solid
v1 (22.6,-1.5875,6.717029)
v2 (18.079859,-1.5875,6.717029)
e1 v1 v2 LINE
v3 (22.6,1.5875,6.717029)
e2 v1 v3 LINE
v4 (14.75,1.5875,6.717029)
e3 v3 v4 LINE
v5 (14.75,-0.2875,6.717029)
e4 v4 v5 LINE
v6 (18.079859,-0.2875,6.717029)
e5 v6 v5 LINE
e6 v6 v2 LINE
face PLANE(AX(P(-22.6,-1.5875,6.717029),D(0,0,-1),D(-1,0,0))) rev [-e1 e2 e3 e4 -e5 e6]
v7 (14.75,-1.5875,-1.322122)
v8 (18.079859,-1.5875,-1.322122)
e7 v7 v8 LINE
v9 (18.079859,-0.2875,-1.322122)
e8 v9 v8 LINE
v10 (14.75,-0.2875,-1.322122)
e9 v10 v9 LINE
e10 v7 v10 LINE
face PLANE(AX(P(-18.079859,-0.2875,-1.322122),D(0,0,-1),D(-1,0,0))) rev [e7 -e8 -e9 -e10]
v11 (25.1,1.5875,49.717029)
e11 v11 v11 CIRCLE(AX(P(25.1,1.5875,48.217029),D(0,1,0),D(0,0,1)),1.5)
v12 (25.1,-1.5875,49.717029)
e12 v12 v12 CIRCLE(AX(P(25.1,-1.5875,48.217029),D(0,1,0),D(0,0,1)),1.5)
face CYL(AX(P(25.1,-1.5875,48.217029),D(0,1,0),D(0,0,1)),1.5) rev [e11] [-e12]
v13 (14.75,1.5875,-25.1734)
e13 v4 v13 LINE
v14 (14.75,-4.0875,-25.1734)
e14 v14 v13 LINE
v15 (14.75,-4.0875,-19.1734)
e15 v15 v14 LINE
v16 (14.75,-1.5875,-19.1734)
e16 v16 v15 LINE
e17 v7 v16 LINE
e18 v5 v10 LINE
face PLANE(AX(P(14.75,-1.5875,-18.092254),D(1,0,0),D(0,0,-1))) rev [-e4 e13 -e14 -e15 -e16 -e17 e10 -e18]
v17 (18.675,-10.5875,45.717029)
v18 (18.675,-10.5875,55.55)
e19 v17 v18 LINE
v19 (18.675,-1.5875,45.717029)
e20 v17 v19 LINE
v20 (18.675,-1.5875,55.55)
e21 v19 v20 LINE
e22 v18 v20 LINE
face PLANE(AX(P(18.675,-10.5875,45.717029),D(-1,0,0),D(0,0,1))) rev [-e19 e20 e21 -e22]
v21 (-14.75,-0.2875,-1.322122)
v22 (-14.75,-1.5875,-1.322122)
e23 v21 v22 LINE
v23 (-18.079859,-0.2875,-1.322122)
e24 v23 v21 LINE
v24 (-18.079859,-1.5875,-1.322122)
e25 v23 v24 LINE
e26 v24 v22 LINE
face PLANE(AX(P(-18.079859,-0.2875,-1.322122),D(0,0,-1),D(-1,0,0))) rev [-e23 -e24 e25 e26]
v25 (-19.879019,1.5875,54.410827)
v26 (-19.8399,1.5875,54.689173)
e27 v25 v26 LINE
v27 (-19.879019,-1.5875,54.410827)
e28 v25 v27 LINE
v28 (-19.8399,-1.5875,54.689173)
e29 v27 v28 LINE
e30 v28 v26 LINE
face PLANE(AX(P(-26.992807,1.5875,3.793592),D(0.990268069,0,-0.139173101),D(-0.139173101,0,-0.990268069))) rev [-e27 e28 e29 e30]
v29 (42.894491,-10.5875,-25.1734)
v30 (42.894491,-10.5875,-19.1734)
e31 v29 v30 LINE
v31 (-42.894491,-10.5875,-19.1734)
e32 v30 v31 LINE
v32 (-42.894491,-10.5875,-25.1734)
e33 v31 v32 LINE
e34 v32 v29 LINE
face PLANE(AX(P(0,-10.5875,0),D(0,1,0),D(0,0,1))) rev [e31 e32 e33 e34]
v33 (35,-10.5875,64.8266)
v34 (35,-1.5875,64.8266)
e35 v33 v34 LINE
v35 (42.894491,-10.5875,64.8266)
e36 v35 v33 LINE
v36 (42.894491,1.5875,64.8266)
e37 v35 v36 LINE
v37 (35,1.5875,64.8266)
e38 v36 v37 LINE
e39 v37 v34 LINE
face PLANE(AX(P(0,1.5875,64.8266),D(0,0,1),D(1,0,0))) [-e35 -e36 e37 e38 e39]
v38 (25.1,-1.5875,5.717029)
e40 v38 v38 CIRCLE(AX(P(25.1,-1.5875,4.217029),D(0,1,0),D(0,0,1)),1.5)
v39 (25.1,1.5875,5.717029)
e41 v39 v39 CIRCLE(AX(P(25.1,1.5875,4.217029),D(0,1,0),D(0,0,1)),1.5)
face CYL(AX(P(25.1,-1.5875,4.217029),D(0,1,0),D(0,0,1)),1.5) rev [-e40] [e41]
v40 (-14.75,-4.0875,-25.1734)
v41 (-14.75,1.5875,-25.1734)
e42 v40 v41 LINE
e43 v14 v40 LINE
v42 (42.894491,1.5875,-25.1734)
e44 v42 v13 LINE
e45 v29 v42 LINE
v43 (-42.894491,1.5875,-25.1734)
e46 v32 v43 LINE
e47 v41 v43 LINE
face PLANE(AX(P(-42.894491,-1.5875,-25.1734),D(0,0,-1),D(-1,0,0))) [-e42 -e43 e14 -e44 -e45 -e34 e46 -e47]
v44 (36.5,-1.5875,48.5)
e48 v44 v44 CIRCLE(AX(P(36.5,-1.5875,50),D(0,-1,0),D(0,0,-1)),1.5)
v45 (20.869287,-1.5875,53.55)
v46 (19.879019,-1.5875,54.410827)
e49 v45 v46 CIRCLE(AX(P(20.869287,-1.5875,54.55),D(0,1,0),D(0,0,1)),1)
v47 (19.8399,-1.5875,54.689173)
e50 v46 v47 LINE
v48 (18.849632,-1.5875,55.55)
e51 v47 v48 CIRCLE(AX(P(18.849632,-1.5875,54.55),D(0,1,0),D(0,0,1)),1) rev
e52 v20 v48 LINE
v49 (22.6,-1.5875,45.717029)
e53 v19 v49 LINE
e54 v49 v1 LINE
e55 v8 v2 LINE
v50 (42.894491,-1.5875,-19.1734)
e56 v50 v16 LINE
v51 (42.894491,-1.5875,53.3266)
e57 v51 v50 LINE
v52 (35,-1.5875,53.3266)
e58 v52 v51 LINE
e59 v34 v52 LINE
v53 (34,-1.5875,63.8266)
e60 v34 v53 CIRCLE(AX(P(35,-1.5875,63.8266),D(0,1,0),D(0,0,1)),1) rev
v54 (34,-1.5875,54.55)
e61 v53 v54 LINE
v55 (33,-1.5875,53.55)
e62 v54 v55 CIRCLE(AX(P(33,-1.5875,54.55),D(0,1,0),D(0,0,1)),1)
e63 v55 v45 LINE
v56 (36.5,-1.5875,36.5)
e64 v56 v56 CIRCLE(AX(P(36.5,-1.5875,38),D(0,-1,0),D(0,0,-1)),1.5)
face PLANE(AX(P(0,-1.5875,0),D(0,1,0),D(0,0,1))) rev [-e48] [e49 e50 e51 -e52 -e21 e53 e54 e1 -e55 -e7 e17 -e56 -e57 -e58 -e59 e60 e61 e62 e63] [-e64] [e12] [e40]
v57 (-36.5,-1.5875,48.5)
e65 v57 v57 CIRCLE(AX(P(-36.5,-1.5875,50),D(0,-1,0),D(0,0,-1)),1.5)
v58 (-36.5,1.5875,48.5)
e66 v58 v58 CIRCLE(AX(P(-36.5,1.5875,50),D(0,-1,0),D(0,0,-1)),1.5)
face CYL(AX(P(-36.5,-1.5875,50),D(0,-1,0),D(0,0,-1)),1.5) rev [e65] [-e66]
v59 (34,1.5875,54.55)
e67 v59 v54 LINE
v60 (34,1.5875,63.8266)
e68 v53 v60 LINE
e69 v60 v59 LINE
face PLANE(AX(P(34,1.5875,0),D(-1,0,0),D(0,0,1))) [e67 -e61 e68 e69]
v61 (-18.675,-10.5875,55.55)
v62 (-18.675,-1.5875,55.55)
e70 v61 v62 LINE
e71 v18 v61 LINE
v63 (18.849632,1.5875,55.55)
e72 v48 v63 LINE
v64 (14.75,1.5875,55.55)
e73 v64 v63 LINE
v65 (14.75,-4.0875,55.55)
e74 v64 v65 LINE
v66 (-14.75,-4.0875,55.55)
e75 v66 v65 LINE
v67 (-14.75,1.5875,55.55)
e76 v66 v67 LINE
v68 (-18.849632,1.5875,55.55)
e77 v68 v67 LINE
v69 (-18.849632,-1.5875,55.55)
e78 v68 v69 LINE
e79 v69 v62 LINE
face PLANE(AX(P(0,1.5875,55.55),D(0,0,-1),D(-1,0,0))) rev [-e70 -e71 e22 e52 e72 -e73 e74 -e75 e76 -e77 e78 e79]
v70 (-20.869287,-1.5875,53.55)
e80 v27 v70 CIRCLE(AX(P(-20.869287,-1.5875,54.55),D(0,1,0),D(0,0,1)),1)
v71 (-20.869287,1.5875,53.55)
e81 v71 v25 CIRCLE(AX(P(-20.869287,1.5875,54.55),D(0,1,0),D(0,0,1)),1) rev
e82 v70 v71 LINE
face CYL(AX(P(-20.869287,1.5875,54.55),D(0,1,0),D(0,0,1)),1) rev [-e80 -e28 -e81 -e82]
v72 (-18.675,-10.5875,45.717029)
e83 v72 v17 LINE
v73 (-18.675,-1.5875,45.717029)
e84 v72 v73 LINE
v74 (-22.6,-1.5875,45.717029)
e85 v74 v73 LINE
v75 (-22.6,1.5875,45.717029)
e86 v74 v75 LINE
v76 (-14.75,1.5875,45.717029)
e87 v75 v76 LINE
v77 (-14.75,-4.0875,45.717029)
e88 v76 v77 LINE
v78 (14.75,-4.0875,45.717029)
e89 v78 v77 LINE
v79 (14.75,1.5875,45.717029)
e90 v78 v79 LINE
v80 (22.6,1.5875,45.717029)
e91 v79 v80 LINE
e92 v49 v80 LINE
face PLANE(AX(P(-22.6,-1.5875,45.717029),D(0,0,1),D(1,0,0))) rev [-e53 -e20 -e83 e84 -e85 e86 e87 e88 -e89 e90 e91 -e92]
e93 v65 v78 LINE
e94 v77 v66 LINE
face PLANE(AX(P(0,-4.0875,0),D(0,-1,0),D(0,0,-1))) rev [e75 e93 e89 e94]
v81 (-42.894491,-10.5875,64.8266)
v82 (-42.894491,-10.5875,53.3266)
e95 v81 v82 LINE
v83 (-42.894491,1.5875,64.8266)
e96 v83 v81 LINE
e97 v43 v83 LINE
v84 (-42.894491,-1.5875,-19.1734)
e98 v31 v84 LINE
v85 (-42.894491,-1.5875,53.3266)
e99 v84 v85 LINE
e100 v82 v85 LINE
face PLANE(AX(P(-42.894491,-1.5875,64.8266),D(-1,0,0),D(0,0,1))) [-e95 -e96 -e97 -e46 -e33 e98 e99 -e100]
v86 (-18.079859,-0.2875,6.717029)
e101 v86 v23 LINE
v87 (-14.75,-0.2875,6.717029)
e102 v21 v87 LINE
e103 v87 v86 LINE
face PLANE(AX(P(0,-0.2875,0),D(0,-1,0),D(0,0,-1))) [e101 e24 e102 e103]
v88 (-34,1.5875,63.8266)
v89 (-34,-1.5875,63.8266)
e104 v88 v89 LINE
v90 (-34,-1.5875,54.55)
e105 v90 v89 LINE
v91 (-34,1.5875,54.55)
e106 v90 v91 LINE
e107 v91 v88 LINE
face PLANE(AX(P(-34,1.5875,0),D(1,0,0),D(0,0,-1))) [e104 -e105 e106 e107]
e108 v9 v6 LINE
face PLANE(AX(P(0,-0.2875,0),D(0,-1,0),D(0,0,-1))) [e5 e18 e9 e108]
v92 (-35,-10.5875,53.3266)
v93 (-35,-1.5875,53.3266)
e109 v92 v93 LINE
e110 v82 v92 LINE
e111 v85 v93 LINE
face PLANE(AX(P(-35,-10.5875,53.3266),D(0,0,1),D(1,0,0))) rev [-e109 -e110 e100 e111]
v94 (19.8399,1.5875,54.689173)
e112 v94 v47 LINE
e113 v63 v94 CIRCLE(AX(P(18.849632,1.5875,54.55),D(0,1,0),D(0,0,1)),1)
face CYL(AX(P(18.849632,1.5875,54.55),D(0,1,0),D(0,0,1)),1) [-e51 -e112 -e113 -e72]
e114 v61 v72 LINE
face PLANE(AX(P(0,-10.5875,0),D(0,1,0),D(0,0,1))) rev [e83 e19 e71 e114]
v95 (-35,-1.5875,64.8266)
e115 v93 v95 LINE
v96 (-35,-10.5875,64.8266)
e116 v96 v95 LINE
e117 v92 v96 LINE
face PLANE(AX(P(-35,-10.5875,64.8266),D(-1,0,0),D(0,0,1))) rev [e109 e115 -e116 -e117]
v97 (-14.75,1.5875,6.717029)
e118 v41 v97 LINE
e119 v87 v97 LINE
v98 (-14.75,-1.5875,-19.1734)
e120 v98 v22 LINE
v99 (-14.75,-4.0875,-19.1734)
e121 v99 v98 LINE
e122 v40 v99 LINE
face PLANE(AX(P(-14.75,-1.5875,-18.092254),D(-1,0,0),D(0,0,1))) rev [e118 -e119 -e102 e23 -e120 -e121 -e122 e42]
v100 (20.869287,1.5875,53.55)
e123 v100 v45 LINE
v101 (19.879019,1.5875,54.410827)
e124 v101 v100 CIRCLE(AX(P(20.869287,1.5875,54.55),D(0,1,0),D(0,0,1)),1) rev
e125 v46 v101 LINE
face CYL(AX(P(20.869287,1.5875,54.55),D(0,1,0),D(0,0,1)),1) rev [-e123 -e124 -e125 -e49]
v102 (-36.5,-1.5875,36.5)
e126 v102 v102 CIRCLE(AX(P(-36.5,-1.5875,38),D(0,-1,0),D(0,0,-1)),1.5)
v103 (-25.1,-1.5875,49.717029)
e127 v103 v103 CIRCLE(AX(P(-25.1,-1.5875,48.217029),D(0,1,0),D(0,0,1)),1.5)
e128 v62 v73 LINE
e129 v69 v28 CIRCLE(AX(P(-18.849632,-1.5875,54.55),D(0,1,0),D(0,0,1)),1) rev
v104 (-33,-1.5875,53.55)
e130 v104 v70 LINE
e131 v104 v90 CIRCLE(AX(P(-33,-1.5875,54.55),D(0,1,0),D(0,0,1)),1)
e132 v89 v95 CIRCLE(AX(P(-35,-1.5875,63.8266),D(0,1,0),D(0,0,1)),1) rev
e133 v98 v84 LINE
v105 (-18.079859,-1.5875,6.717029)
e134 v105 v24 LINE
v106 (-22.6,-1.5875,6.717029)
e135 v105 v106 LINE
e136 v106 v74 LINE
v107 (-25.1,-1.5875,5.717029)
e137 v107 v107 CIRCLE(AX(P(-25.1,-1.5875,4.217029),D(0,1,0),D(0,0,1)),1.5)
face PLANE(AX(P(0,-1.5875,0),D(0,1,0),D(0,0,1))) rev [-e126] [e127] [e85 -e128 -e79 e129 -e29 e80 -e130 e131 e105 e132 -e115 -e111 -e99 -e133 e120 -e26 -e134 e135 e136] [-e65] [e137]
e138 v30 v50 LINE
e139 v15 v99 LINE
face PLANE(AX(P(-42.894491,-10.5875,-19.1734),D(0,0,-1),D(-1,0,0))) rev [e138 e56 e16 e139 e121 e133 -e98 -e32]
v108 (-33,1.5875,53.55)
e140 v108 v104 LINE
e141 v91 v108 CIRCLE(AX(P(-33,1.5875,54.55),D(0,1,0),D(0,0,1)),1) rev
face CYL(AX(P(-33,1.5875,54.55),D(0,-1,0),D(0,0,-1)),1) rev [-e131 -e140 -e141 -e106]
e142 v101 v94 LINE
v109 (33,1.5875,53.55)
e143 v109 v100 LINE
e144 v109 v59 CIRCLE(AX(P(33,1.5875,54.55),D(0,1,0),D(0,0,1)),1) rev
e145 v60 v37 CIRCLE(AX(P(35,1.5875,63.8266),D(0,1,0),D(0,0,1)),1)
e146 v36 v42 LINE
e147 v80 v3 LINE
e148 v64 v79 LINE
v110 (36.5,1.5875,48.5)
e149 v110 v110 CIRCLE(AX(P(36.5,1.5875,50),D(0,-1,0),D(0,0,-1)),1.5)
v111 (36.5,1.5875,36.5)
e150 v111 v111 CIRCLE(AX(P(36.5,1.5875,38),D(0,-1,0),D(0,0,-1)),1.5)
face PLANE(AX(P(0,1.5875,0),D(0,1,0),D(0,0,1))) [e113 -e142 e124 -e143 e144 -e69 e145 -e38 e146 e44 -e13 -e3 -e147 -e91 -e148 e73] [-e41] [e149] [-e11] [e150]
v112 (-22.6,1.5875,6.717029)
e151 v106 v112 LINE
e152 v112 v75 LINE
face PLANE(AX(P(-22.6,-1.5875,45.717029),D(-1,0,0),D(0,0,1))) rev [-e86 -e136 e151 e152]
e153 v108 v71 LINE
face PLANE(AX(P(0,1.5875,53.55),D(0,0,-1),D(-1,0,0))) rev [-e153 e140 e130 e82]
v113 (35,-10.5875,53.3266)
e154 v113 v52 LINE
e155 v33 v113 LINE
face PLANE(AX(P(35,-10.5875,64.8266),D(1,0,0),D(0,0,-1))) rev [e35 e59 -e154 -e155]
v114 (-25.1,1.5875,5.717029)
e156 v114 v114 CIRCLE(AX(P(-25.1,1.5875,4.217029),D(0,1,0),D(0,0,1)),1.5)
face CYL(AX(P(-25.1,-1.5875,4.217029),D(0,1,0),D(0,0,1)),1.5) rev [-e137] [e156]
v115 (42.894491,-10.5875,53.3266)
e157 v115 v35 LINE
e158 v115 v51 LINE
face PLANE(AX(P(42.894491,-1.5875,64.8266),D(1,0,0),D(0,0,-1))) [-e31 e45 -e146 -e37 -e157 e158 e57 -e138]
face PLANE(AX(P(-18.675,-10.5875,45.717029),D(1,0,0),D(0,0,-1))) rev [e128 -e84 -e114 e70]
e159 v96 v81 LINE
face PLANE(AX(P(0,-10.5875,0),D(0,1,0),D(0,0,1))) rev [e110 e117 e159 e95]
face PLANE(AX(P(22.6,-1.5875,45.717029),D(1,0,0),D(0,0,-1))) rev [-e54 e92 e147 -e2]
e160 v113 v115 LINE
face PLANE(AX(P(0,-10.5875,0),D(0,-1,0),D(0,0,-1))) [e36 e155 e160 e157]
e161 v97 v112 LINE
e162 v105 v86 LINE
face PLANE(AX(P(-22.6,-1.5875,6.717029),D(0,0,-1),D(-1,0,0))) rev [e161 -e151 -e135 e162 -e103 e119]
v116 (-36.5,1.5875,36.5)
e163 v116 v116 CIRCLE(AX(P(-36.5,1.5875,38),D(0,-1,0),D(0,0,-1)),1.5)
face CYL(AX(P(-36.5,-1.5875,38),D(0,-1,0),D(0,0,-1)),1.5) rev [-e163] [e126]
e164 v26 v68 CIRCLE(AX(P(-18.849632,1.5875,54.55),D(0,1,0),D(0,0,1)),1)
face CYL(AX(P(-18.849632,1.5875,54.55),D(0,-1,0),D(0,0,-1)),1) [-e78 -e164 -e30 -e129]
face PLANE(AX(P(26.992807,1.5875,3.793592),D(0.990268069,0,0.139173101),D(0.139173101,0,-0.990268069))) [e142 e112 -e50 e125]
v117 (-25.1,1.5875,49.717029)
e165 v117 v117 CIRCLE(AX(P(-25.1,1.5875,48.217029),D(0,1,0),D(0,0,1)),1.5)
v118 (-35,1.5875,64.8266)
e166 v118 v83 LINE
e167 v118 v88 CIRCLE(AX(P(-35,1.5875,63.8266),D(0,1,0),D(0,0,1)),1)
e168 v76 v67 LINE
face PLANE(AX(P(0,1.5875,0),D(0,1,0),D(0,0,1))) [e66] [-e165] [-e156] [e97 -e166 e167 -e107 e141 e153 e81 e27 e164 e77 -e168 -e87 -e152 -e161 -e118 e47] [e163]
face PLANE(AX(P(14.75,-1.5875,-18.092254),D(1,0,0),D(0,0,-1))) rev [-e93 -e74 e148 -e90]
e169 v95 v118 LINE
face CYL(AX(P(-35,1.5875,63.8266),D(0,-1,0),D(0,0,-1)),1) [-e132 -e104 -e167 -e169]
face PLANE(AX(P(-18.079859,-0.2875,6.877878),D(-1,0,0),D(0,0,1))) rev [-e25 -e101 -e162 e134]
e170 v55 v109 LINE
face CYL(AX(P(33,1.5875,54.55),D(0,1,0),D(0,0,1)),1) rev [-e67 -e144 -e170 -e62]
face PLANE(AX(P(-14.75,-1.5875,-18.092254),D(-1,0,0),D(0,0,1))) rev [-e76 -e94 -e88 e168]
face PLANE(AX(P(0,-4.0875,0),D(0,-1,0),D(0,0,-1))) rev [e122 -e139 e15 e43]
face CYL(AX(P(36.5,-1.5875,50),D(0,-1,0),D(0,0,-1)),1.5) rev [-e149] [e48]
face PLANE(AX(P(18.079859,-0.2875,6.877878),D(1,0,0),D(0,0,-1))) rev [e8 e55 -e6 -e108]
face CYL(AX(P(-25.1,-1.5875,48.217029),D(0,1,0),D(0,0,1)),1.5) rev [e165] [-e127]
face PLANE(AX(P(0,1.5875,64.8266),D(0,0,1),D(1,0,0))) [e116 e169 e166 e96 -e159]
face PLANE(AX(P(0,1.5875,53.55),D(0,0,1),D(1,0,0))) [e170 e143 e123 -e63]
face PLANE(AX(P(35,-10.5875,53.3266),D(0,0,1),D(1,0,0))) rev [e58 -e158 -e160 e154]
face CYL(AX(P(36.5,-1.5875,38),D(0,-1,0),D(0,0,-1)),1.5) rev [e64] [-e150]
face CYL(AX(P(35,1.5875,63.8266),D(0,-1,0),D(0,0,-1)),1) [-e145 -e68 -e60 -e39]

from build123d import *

# Parameters (mm, degrees)
BOSS_EXTRUDE4_DEPTH    = 1.5875
M3_CLEARANCE_HOLE3_D   = 3
M3_CLEARANCE_HOLE1_D   = 3.1
M3_CLEARANCE_HOLE4_D   = 2.95
M3_CLEARANCE_HOLE2_D   = 3.1
M3_CLEARANCE_HOLE5_D   = 3
BOSS_EXTRUDE6_START    = -3.175
BOSS_EXTRUDE6_DEPTH    = 3.175
FILLET1_R              = 2
CUT_EXTRUDE4_START     = -1.5875
CUT_EXTRUDE4_OUTLINE_W = 45.2
CUT_EXTRUDE4_OUTLINE_H = 39
CUT_EXTRUDE4_OUTLINE_R = 1.5
CUT_EXTRUDE4_DEPTH     = 3.175
CUT_EXTRUDE4_2_DEPTH   = 3.175
SKETCH29_W             = 29.5
SKETCH29_H             = 74
CUT_EXTRUDE5_DEPTH     = 121.250075364
SKETCH30_R             = 1.5
CUT_EXTRUDE6_DEPTH     = 121.250075364
SKETCH31_W             = 36.15971715
SKETCH31_H             = 8.2
CUT_EXTRUDE7_DEPTH     = 1.3
SKETCH32_OUTSIDE_W     = 217.324
SKETCH32_OUTSIDE_H     = 197.151
SKETCH32_OUTSIDE_W_2   = 85.788981544
SKETCH32_OUTSIDE_H_2   = 90
CUT_EXTRUDE8_DEPTH     = 121.250075364
SKETCH33_W             = 7.894490772
SKETCH33_H             = 11.5
SKETCH33_W_2           = 37.35
SKETCH33_H_2           = 9.832970801
SKETCH33_W_3           = 85.788981544
SKETCH33_H_3           = 6
BOSS_EXTRUDE9_DEPTH    = 9
SKETCH34_W             = 29.5
SKETCH34_H             = 9.832970801
CUT_EXTRUDE9_DEPTH     = 2.5
SKETCH35_W             = 29.5
SKETCH35_H             = 7.081145589
CUT_EXTRUDE10_DEPTH    = 5.675


# Read off the part's stored shape, not the designer's step: Cut-Extrude4
with BuildPart() as part:
    # Sketch1 → Boss-Extrude4 (new, symmetric)
    with BuildSketch(Plane(origin=(0, 0, 0), x_dir=(1, 0, 0), z_dir=(0, 1, 0))):
        with BuildLine():
            Line((-62.799553621, 32.496136604), (-73.969425011, 32.691107434))
            Line((-73.969425011, 32.691107434), (-77.053684287, 35.88495141))
            ThreePointArc((-77.053684287, 35.88495141), (-84.36642289, 10.358894189), (-83.446216027, -16.178041625))
            Line((-83.446216027, -16.178041625), (-79.680911643, -13.825218315))
            Line((-79.680911643, -13.825218315), (-69.484649137, -16.179210996))
            Line((-69.484649137, -16.179210996), (-43.894490772, -57.132025032))
            Line((-43.894490772, -57.132025032), (-43.894490772, -64.826600275))
            Line((-43.894490772, -64.826600275), (-43.094490772, -64.826600275))
            Line((-43.094490772, -64.826600275), (-34, -64.826600275))
            Line((-34, -64.826600275), (-34, -55.55))
            Line((-34, -55.55), (-34, -53.55))
            Line((-34, -53.55), (-20, -53.55))
            Line((-20, -53.55), (-19.718918331, -55.55))
            Line((-19.718918331, -55.55), (19.718918331, -55.55))
            Line((19.718918331, -55.55), (20, -53.55))
            Line((20, -53.55), (34, -53.55))
            Line((34, -53.55), (34, -55.55))
            Line((34, -55.55), (34, -64.826600275))
            Line((34, -64.826600275), (43.094490772, -64.826600275))
            Line((43.094490772, -64.826600275), (43.894490772, -64.826600275))
            Line((43.894490772, -64.826600275), (43.894490772, -57.132025032))
            Line((43.894490772, -57.132025032), (69.484649137, -16.179210996))
            Line((69.484649137, -16.179210996), (79.680911643, -13.825218315))
            Line((79.680911643, -13.825218315), (83.446216027, -16.178041625))
            ThreePointArc((83.446216027, -16.178041625), (84.610662337, -8.126242604), (85, 0))
            ThreePointArc((85, 0), (82.98964744, 18.377116688), (77.053684287, 35.88495141))
            Line((77.053684287, 35.88495141), (73.969425011, 32.691107434))
            Line((73.969425011, 32.691107434), (62.799553621, 32.496136604))
            Line((62.799553621, 32.496136604), (30.284668021, 63.895396642))
            Line((30.284668021, 63.895396642), (30.089697191, 75.065268032))
            Line((30.089697191, 75.065268032), (33.173956467, 78.259112008))
            ThreePointArc((33.173956467, 78.259112008), (0, 85), (-33.173956467, 78.259112008))
            Line((-33.173956467, 78.259112008), (-30.089697191, 75.065268032))
            Line((-30.089697191, 75.065268032), (-30.284668021, 63.895396642))
            Line((-30.284668021, 63.895396642), (-62.799553621, 32.496136604))
        make_face()
    extrude(amount=BOSS_EXTRUDE4_DEPTH, both=True)

    # M3 Clearance Hole3 (through all)
    with Locations(Plane(origin=(0, -1.5875, 0), x_dir=(-1, 0, 0), z_dir=(0, -1, 0))):
        with Locations((36.5, -50), (36.5, -38), (-36.5, -50), (-36.5, -38)):
            Hole(M3_CLEARANCE_HOLE3_D / 2)

    # M3 Clearance Hole1 (through all)
    with Locations(Plane(origin=(0, 1.5875, 0), x_dir=(1, 0, 0), z_dir=(0, 1, 0))):
        with Locations((-78.542321426, -8.49139241), (78.542321426, -8.49139241), (74.155025063, 27.240269049), (-74.155025063, 27.240269049)):
            Hole(M3_CLEARANCE_HOLE1_D / 2)

    # M3 Clearance Hole4 (through all)
    with Locations(Plane(origin=(0, -1.5875, 0), x_dir=(-1, 0, 0), z_dir=(0, -1, 0))):
        with Locations((-67.099301622, -15.278865202), (-50.141885166, -42.416404279), (-61.062544382, 30.698137949), (-38.043670771, 52.927205804), (50.141885166, -42.416404279), (67.099301622, -15.278865202), (38.043670771, 52.927205804), (61.062544382, 30.698137949)):
            Hole(M3_CLEARANCE_HOLE4_D / 2)

    # M3 Clearance Hole2 (through all)
    with Locations(Plane(origin=(0, 1.5875, 0), x_dir=(1, 0, 0), z_dir=(0, 1, 0))):
        with Locations((27, 76.497766718), (-27, 76.497766718)):
            Hole(M3_CLEARANCE_HOLE2_D / 2)

    # M3 Clearance Hole5 (through all)
    with Locations(Plane(origin=(0, 1.5875, 0), x_dir=(1, 0, 0), z_dir=(0, 1, 0))):
        with Locations((-11, -4.4), (11, -4.4), (11, -36.4), (-11, -36.4), (-11, 37.6), (11, 37.6)):
            Hole(M3_CLEARANCE_HOLE5_D / 2)

    # Sketch22 → Boss-Extrude6 (add)
    with BuildSketch(Plane(origin=(0, 1.5875, 0), x_dir=(1, 0, 0), z_dir=(0, 1, 0)).offset(BOSS_EXTRUDE6_START)):
        Polygon((65.061950694, 32.535626892), (30.245177733, 66.157793715), (30.284668021, 63.895396642), (62.799553621, 32.496136604), align=None)
        Polygon((-30.284668021, 63.895396642), (-30.245177733, 66.157793715), (-65.061950694, 32.535626892), (-62.799553621, 32.496136604), align=None)
        Polygon((43.894490772, -60.151352895), (71.689396914, -15.670204865), (69.484649137, -16.179210996), (43.894490772, -57.132025032), align=None)
        Polygon((-69.484649137, -16.179210996), (-71.689396914, -15.670204865), (-43.894490772, -60.151352895), (-43.894490772, -57.132025032), align=None)
    extrude(amount=BOSS_EXTRUDE6_DEPTH)

    # Fillet1
    fillet1_edges = [part.edges().sort_by_distance(p)[0] for p in [
        (-30.245177733, -0.79375, -66.157793715),
        (-65.061950694, -0.79375, -32.535626892),
        (-71.689396914, 0.79375, 15.670204865),
        (-43.894490772, 0.79375, 60.151352895),
        (43.894490772, -0.79375, 60.151352895),
        (71.689396914, -0.79375, 15.670204865),
        (65.061950694, -0.79375, -32.535626892),
        (30.245177733, 0.79375, -66.157793715),
        (30.089697191, -0.79375, -75.065268032),
        (73.969425011, -0.79375, -32.691107434),
        (79.680911643, -0.79375, 13.825218315),
        (-79.680911643, -0.79375, 13.825218315),
        (-73.969425011, -0.79375, -32.691107434),
        (-30.089697191, -0.79375, -75.065268032),
    ]]
    fillet(fillet1_edges, radius=FILLET1_R)

    # Cut-Extrude4 outline → Cut-Extrude4 (cut)
    # profile 1 of 13: a face of its own
    with BuildSketch(Plane(origin=(0, 0, 0), x_dir=(1, 0, 0), z_dir=(0, 1, 0)).offset(CUT_EXTRUDE4_START)):
        with BuildLine():
            Line((-43.894490772, -64.826600275), (-42.894490772, -64.826600275))
            ThreePointArc((-42.894490772, -64.826600275), (-43.601597553, -64.533707056), (-43.894490772, -63.826600275))
            Line((-43.894490772, -63.826600275), (-43.894490772, -64.826600275))
        make_face()
    # profile 2 of 13: a face of its own
    with BuildSketch(Plane(origin=(0, 0, 0), x_dir=(1, 0, 0), z_dir=(0, 1, 0)).offset(CUT_EXTRUDE4_START)):
        with BuildLine():
            ThreePointArc((43.894490772, -63.826600275), (43.601597553, -64.533707056), (42.894490772, -64.826600275))
            Line((42.894490772, -64.826600275), (43.894490772, -64.826600275))
            Line((43.894490772, -64.826600275), (43.894490772, -63.826600275))
        make_face()
    # profile 3 of 13: a face of its own
    with BuildSketch(Plane(origin=(0, 0, 0), x_dir=(1, 0, 0), z_dir=(0, 1, 0)).offset(CUT_EXTRUDE4_START)):
        with BuildLine():
            ThreePointArc((35, -64.826600275), (34.292893219, -64.533707056), (34, -63.826600275))
            Line((34, -63.826600275), (34, -64.826600275))
            Line((34, -64.826600275), (35, -64.826600275))
        make_face()
    # profile 4 of 13: a face of its own
    with BuildSketch(Plane(origin=(0, 0, 0), x_dir=(1, 0, 0), z_dir=(0, 1, 0)).offset(CUT_EXTRUDE4_START)):
        with BuildLine():
            ThreePointArc((19.839899662, -54.689173101), (19.505690622, -55.30470958), (18.849631593, -55.55))
            Line((18.849631593, -55.55), (19.718918331, -55.55))
            Line((19.718918331, -55.55), (19.839899662, -54.689173101))
        make_face()
    # profile 5 of 13: a face of its own
    with BuildSketch(Plane(origin=(0, 0, 0), x_dir=(1, 0, 0), z_dir=(0, 1, 0)).offset(CUT_EXTRUDE4_START)):
        with BuildLine():
            ThreePointArc((-18.849631593, -55.55), (-19.505690622, -55.30470958), (-19.839899662, -54.689173101))
            Line((-19.839899662, -54.689173101), (-19.718918331, -55.55))
            Line((-19.718918331, -55.55), (-18.849631593, -55.55))
        make_face()
    # profile 6 of 13: a face of its own
    with BuildSketch(Plane(origin=(0, 0, 0), x_dir=(1, 0, 0), z_dir=(0, 1, 0)).offset(CUT_EXTRUDE4_START)):
        with BuildLine():
            ThreePointArc((-34, -63.826600275), (-34.292893219, -64.533707056), (-35, -64.826600275))
            Line((-35, -64.826600275), (-34, -64.826600275))
            Line((-34, -64.826600275), (-34, -63.826600275))
        make_face()
    # profile 7 of 13: a face of its own
    with BuildSketch(Plane(origin=(0, 0, 0), x_dir=(1, 0, 0), z_dir=(0, 1, 0)).offset(CUT_EXTRUDE4_START)):
        with BuildLine():
            Line((-83.446216027, -16.178041625), (-82.20011414, -15.399390747))
            ThreePointArc((-82.20011414, -15.399390747), (-83.136963865, -15.464801791), (-83.714914754, -14.72457292))
            ThreePointArc((-83.714914754, -14.72457292), (-83.583724815, -15.451891346), (-83.446216027, -16.178041625))
        make_face()
    # profile 8 of 13: a face of its own
    with BuildSketch(Plane(origin=(0, 0, 0), x_dir=(1, 0, 0), z_dir=(0, 1, 0)).offset(CUT_EXTRUDE4_START)):
        with BuildLine():
            ThreePointArc((-77.053684287, 35.88495141), (-77.362780128, 35.213637285), (-77.666027418, 34.539661043))
            ThreePointArc((-77.666027418, 34.539661043), (-76.926166569, 35.118082978), (-76.032969649, 34.82797046))
            Line((-76.032969649, 34.82797046), (-77.053684287, 35.88495141))
        make_face()
    # profile 9 of 13: a face of its own
    with BuildSketch(Plane(origin=(0, 0, 0), x_dir=(1, 0, 0), z_dir=(0, 1, 0)).offset(CUT_EXTRUDE4_START)):
        with BuildLine():
            Line((-33.173956467, 78.259112008), (-32.153241828, 77.202131058))
            ThreePointArc((-32.153241828, 77.202131058), (-32.412005494, 78.104908648), (-31.808115147, 78.82413216))
            ThreePointArc((-31.808115147, 78.82413216), (-32.492263999, 78.544591031), (-33.173956467, 78.259112008))
        make_face()
    # profile 10 of 13: a face of its own
    with BuildSketch(Plane(origin=(0, 0, 0), x_dir=(1, 0, 0), z_dir=(0, 1, 0)).offset(CUT_EXTRUDE4_START)):
        with BuildLine():
            ThreePointArc((33.173956467, 78.259112008), (32.492263999, 78.544591031), (31.808115147, 78.82413216))
            ThreePointArc((31.808115147, 78.82413216), (32.412005494, 78.104908648), (32.153241828, 77.202131058))
            Line((32.153241828, 77.202131058), (33.173956467, 78.259112008))
        make_face()
    # profile 11 of 13: a face of its own
    with BuildSketch(Plane(origin=(0, 0, 0), x_dir=(1, 0, 0), z_dir=(0, 1, 0)).offset(CUT_EXTRUDE4_START)):
        with BuildLine():
            Line((77.053684287, 35.88495141), (76.032969649, 34.82797046))
            ThreePointArc((76.032969649, 34.82797046), (76.926166569, 35.118082978), (77.666027419, 34.539661043))
            ThreePointArc((77.666027419, 34.539661043), (77.362780128, 35.213637285), (77.053684287, 35.88495141))
        make_face()
    # profile 12 of 13: a face of its own
    with BuildSketch(Plane(origin=(0, 0, 0), x_dir=(1, 0, 0), z_dir=(0, 1, 0)).offset(CUT_EXTRUDE4_START)):
        with BuildLine():
            ThreePointArc((83.446216027, -16.178041625), (83.583724815, -15.451891346), (83.714914755, -14.72457292))
            ThreePointArc((83.714914755, -14.72457292), (83.136963865, -15.464801791), (82.20011414, -15.399390747))
            Line((82.20011414, -15.399390747), (83.446216027, -16.178041625))
        make_face()
    # profile 13 of 13: a face of its own
    with BuildSketch(Plane(origin=(0, 0, 0), x_dir=(1, 0, 0), z_dir=(0, 1, 0)).offset(CUT_EXTRUDE4_START)):
        with Locations((0, -26.217029199)):
            Rectangle(CUT_EXTRUDE4_OUTLINE_W, CUT_EXTRUDE4_OUTLINE_H)
        with Locations((-11, -36.4)):
            Circle(CUT_EXTRUDE4_OUTLINE_R, mode=Mode.SUBTRACT)
        with Locations((11, -36.4)):
            Circle(CUT_EXTRUDE4_OUTLINE_R, mode=Mode.SUBTRACT)
    extrude(amount=CUT_EXTRUDE4_DEPTH, mode=Mode.SUBTRACT)

    # Cut-Extrude4 2 outline → Cut-Extrude4 2 (add)
    with BuildSketch(Plane(origin=(0, 0, 0), x_dir=(1, 0, 0), z_dir=(0, 1, 0)).offset(CUT_EXTRUDE4_START)):
        with BuildLine():
            Line((34, -53.55), (33, -53.55))
            ThreePointArc((33, -53.55), (33.707106781, -53.842893219), (34, -54.55))
            Line((34, -54.55), (34, -53.55))
        make_face()
        with BuildLine():
            Line((20, -53.55), (19.879018669, -54.410826899))
            ThreePointArc((19.879018669, -54.410826899), (20.213227709, -53.79529042), (20.869286738, -53.55))
            Line((20.869286738, -53.55), (20, -53.55))
        make_face()
        with BuildLine():
            Line((-20, -53.55), (-20.869286738, -53.55))
            ThreePointArc((-20.869286738, -53.55), (-20.213227709, -53.79529042), (-19.879018669, -54.410826899))
            Line((-19.879018669, -54.410826899), (-20, -53.55))
        make_face()
        with BuildLine():
            Line((-34, -53.55), (-34, -54.55))
            ThreePointArc((-34, -54.55), (-33.707106781, -53.842893219), (-33, -53.55))
            Line((-33, -53.55), (-34, -53.55))
        make_face()
    extrude(amount=CUT_EXTRUDE4_2_DEPTH)

    # Sketch29 → Cut-Extrude5 (cut, through all)
    with BuildSketch(Plane(origin=(0, 1.5875, 0), x_dir=(1, 0, 0), z_dir=(0, 1, 0))):
        with Locations((0, -18.907745864)):
            Rectangle(SKETCH29_W, SKETCH29_H)
    extrude(amount=-CUT_EXTRUDE5_DEPTH, mode=Mode.SUBTRACT)

    # Sketch30 → Cut-Extrude6 (cut, through all)
    with BuildSketch(Plane(origin=(0, 1.5875, 0), x_dir=(1, 0, 0), z_dir=(0, 1, 0))):
        with Locations(Location((25.1, -48.217029199, 0), (0, 0, 270))):
            Circle(SKETCH30_R)
        with Locations(Location((25.1, -4.217029199, 0), (0, 0, 270))):
            Circle(SKETCH30_R)
        with Locations(Location((-25.1, -4.217029199, 0), (0, 0, 270))):
            Circle(SKETCH30_R)
        with Locations(Location((-25.1, -48.217029199, 0), (0, 0, 270))):
            Circle(SKETCH30_R)
    extrude(amount=-CUT_EXTRUDE6_DEPTH, mode=Mode.SUBTRACT)

    # Sketch31 → Cut-Extrude7 (cut)
    with BuildSketch(Plane.XZ.offset(1.5875)):
        with Locations((0, 2.777878312)):
            Rectangle(SKETCH31_W, SKETCH31_H)
    extrude(amount=-CUT_EXTRUDE7_DEPTH, mode=Mode.SUBTRACT)

    # Sketch32 outside → Cut-Extrude8 (cut, through all)
    with BuildSketch(Plane(origin=(0, 1.5875, 0), x_dir=(1, 0, 0), z_dir=(0, 1, 0))):
        with Locations((0, 10.0865)):
            Rectangle(SKETCH32_OUTSIDE_W, SKETCH32_OUTSIDE_H)
        with Locations((0, -19.826600275)):
            Rectangle(SKETCH32_OUTSIDE_W_2, SKETCH32_OUTSIDE_H_2, mode=Mode.SUBTRACT)
    extrude(amount=-CUT_EXTRUDE8_DEPTH, mode=Mode.SUBTRACT)

    # Sketch33 → Boss-Extrude9 (add)
    with BuildSketch(Plane.XZ.offset(1.5875)):
        with Locations((-38.947245386, 59.076600275)):
            Rectangle(SKETCH33_W, SKETCH33_H)
        with Locations((38.947245386, 59.076600275)):
            Rectangle(SKETCH33_W, SKETCH33_H)
        with Locations((0, 50.6335146)):
            Rectangle(SKETCH33_W_2, SKETCH33_H_2)
        with Locations((0, -22.173399725)):
            Rectangle(SKETCH33_W_3, SKETCH33_H_3)
    extrude(amount=BOSS_EXTRUDE9_DEPTH)

    # Sketch34 → Cut-Extrude9 (cut)
    with BuildSketch(Plane(origin=(0, -1.5875, 0), x_dir=(1, 0, 0), z_dir=(0, 1, 0))):
        with Locations((0, -50.6335146)):
            Rectangle(SKETCH34_W, SKETCH34_H)
    extrude(amount=-CUT_EXTRUDE9_DEPTH, mode=Mode.SUBTRACT)

    # Sketch35 → Cut-Extrude10 (cut)
    with BuildSketch(Plane(origin=(0, 1.5875, 0), x_dir=(1, 0, 0), z_dir=(0, 1, 0))):
        with Locations((0, 21.632826931)):
            Rectangle(SKETCH35_W, SKETCH35_H)
    extrude(amount=-CUT_EXTRUDE10_DEPTH, mode=Mode.SUBTRACT)


solid = part.part
